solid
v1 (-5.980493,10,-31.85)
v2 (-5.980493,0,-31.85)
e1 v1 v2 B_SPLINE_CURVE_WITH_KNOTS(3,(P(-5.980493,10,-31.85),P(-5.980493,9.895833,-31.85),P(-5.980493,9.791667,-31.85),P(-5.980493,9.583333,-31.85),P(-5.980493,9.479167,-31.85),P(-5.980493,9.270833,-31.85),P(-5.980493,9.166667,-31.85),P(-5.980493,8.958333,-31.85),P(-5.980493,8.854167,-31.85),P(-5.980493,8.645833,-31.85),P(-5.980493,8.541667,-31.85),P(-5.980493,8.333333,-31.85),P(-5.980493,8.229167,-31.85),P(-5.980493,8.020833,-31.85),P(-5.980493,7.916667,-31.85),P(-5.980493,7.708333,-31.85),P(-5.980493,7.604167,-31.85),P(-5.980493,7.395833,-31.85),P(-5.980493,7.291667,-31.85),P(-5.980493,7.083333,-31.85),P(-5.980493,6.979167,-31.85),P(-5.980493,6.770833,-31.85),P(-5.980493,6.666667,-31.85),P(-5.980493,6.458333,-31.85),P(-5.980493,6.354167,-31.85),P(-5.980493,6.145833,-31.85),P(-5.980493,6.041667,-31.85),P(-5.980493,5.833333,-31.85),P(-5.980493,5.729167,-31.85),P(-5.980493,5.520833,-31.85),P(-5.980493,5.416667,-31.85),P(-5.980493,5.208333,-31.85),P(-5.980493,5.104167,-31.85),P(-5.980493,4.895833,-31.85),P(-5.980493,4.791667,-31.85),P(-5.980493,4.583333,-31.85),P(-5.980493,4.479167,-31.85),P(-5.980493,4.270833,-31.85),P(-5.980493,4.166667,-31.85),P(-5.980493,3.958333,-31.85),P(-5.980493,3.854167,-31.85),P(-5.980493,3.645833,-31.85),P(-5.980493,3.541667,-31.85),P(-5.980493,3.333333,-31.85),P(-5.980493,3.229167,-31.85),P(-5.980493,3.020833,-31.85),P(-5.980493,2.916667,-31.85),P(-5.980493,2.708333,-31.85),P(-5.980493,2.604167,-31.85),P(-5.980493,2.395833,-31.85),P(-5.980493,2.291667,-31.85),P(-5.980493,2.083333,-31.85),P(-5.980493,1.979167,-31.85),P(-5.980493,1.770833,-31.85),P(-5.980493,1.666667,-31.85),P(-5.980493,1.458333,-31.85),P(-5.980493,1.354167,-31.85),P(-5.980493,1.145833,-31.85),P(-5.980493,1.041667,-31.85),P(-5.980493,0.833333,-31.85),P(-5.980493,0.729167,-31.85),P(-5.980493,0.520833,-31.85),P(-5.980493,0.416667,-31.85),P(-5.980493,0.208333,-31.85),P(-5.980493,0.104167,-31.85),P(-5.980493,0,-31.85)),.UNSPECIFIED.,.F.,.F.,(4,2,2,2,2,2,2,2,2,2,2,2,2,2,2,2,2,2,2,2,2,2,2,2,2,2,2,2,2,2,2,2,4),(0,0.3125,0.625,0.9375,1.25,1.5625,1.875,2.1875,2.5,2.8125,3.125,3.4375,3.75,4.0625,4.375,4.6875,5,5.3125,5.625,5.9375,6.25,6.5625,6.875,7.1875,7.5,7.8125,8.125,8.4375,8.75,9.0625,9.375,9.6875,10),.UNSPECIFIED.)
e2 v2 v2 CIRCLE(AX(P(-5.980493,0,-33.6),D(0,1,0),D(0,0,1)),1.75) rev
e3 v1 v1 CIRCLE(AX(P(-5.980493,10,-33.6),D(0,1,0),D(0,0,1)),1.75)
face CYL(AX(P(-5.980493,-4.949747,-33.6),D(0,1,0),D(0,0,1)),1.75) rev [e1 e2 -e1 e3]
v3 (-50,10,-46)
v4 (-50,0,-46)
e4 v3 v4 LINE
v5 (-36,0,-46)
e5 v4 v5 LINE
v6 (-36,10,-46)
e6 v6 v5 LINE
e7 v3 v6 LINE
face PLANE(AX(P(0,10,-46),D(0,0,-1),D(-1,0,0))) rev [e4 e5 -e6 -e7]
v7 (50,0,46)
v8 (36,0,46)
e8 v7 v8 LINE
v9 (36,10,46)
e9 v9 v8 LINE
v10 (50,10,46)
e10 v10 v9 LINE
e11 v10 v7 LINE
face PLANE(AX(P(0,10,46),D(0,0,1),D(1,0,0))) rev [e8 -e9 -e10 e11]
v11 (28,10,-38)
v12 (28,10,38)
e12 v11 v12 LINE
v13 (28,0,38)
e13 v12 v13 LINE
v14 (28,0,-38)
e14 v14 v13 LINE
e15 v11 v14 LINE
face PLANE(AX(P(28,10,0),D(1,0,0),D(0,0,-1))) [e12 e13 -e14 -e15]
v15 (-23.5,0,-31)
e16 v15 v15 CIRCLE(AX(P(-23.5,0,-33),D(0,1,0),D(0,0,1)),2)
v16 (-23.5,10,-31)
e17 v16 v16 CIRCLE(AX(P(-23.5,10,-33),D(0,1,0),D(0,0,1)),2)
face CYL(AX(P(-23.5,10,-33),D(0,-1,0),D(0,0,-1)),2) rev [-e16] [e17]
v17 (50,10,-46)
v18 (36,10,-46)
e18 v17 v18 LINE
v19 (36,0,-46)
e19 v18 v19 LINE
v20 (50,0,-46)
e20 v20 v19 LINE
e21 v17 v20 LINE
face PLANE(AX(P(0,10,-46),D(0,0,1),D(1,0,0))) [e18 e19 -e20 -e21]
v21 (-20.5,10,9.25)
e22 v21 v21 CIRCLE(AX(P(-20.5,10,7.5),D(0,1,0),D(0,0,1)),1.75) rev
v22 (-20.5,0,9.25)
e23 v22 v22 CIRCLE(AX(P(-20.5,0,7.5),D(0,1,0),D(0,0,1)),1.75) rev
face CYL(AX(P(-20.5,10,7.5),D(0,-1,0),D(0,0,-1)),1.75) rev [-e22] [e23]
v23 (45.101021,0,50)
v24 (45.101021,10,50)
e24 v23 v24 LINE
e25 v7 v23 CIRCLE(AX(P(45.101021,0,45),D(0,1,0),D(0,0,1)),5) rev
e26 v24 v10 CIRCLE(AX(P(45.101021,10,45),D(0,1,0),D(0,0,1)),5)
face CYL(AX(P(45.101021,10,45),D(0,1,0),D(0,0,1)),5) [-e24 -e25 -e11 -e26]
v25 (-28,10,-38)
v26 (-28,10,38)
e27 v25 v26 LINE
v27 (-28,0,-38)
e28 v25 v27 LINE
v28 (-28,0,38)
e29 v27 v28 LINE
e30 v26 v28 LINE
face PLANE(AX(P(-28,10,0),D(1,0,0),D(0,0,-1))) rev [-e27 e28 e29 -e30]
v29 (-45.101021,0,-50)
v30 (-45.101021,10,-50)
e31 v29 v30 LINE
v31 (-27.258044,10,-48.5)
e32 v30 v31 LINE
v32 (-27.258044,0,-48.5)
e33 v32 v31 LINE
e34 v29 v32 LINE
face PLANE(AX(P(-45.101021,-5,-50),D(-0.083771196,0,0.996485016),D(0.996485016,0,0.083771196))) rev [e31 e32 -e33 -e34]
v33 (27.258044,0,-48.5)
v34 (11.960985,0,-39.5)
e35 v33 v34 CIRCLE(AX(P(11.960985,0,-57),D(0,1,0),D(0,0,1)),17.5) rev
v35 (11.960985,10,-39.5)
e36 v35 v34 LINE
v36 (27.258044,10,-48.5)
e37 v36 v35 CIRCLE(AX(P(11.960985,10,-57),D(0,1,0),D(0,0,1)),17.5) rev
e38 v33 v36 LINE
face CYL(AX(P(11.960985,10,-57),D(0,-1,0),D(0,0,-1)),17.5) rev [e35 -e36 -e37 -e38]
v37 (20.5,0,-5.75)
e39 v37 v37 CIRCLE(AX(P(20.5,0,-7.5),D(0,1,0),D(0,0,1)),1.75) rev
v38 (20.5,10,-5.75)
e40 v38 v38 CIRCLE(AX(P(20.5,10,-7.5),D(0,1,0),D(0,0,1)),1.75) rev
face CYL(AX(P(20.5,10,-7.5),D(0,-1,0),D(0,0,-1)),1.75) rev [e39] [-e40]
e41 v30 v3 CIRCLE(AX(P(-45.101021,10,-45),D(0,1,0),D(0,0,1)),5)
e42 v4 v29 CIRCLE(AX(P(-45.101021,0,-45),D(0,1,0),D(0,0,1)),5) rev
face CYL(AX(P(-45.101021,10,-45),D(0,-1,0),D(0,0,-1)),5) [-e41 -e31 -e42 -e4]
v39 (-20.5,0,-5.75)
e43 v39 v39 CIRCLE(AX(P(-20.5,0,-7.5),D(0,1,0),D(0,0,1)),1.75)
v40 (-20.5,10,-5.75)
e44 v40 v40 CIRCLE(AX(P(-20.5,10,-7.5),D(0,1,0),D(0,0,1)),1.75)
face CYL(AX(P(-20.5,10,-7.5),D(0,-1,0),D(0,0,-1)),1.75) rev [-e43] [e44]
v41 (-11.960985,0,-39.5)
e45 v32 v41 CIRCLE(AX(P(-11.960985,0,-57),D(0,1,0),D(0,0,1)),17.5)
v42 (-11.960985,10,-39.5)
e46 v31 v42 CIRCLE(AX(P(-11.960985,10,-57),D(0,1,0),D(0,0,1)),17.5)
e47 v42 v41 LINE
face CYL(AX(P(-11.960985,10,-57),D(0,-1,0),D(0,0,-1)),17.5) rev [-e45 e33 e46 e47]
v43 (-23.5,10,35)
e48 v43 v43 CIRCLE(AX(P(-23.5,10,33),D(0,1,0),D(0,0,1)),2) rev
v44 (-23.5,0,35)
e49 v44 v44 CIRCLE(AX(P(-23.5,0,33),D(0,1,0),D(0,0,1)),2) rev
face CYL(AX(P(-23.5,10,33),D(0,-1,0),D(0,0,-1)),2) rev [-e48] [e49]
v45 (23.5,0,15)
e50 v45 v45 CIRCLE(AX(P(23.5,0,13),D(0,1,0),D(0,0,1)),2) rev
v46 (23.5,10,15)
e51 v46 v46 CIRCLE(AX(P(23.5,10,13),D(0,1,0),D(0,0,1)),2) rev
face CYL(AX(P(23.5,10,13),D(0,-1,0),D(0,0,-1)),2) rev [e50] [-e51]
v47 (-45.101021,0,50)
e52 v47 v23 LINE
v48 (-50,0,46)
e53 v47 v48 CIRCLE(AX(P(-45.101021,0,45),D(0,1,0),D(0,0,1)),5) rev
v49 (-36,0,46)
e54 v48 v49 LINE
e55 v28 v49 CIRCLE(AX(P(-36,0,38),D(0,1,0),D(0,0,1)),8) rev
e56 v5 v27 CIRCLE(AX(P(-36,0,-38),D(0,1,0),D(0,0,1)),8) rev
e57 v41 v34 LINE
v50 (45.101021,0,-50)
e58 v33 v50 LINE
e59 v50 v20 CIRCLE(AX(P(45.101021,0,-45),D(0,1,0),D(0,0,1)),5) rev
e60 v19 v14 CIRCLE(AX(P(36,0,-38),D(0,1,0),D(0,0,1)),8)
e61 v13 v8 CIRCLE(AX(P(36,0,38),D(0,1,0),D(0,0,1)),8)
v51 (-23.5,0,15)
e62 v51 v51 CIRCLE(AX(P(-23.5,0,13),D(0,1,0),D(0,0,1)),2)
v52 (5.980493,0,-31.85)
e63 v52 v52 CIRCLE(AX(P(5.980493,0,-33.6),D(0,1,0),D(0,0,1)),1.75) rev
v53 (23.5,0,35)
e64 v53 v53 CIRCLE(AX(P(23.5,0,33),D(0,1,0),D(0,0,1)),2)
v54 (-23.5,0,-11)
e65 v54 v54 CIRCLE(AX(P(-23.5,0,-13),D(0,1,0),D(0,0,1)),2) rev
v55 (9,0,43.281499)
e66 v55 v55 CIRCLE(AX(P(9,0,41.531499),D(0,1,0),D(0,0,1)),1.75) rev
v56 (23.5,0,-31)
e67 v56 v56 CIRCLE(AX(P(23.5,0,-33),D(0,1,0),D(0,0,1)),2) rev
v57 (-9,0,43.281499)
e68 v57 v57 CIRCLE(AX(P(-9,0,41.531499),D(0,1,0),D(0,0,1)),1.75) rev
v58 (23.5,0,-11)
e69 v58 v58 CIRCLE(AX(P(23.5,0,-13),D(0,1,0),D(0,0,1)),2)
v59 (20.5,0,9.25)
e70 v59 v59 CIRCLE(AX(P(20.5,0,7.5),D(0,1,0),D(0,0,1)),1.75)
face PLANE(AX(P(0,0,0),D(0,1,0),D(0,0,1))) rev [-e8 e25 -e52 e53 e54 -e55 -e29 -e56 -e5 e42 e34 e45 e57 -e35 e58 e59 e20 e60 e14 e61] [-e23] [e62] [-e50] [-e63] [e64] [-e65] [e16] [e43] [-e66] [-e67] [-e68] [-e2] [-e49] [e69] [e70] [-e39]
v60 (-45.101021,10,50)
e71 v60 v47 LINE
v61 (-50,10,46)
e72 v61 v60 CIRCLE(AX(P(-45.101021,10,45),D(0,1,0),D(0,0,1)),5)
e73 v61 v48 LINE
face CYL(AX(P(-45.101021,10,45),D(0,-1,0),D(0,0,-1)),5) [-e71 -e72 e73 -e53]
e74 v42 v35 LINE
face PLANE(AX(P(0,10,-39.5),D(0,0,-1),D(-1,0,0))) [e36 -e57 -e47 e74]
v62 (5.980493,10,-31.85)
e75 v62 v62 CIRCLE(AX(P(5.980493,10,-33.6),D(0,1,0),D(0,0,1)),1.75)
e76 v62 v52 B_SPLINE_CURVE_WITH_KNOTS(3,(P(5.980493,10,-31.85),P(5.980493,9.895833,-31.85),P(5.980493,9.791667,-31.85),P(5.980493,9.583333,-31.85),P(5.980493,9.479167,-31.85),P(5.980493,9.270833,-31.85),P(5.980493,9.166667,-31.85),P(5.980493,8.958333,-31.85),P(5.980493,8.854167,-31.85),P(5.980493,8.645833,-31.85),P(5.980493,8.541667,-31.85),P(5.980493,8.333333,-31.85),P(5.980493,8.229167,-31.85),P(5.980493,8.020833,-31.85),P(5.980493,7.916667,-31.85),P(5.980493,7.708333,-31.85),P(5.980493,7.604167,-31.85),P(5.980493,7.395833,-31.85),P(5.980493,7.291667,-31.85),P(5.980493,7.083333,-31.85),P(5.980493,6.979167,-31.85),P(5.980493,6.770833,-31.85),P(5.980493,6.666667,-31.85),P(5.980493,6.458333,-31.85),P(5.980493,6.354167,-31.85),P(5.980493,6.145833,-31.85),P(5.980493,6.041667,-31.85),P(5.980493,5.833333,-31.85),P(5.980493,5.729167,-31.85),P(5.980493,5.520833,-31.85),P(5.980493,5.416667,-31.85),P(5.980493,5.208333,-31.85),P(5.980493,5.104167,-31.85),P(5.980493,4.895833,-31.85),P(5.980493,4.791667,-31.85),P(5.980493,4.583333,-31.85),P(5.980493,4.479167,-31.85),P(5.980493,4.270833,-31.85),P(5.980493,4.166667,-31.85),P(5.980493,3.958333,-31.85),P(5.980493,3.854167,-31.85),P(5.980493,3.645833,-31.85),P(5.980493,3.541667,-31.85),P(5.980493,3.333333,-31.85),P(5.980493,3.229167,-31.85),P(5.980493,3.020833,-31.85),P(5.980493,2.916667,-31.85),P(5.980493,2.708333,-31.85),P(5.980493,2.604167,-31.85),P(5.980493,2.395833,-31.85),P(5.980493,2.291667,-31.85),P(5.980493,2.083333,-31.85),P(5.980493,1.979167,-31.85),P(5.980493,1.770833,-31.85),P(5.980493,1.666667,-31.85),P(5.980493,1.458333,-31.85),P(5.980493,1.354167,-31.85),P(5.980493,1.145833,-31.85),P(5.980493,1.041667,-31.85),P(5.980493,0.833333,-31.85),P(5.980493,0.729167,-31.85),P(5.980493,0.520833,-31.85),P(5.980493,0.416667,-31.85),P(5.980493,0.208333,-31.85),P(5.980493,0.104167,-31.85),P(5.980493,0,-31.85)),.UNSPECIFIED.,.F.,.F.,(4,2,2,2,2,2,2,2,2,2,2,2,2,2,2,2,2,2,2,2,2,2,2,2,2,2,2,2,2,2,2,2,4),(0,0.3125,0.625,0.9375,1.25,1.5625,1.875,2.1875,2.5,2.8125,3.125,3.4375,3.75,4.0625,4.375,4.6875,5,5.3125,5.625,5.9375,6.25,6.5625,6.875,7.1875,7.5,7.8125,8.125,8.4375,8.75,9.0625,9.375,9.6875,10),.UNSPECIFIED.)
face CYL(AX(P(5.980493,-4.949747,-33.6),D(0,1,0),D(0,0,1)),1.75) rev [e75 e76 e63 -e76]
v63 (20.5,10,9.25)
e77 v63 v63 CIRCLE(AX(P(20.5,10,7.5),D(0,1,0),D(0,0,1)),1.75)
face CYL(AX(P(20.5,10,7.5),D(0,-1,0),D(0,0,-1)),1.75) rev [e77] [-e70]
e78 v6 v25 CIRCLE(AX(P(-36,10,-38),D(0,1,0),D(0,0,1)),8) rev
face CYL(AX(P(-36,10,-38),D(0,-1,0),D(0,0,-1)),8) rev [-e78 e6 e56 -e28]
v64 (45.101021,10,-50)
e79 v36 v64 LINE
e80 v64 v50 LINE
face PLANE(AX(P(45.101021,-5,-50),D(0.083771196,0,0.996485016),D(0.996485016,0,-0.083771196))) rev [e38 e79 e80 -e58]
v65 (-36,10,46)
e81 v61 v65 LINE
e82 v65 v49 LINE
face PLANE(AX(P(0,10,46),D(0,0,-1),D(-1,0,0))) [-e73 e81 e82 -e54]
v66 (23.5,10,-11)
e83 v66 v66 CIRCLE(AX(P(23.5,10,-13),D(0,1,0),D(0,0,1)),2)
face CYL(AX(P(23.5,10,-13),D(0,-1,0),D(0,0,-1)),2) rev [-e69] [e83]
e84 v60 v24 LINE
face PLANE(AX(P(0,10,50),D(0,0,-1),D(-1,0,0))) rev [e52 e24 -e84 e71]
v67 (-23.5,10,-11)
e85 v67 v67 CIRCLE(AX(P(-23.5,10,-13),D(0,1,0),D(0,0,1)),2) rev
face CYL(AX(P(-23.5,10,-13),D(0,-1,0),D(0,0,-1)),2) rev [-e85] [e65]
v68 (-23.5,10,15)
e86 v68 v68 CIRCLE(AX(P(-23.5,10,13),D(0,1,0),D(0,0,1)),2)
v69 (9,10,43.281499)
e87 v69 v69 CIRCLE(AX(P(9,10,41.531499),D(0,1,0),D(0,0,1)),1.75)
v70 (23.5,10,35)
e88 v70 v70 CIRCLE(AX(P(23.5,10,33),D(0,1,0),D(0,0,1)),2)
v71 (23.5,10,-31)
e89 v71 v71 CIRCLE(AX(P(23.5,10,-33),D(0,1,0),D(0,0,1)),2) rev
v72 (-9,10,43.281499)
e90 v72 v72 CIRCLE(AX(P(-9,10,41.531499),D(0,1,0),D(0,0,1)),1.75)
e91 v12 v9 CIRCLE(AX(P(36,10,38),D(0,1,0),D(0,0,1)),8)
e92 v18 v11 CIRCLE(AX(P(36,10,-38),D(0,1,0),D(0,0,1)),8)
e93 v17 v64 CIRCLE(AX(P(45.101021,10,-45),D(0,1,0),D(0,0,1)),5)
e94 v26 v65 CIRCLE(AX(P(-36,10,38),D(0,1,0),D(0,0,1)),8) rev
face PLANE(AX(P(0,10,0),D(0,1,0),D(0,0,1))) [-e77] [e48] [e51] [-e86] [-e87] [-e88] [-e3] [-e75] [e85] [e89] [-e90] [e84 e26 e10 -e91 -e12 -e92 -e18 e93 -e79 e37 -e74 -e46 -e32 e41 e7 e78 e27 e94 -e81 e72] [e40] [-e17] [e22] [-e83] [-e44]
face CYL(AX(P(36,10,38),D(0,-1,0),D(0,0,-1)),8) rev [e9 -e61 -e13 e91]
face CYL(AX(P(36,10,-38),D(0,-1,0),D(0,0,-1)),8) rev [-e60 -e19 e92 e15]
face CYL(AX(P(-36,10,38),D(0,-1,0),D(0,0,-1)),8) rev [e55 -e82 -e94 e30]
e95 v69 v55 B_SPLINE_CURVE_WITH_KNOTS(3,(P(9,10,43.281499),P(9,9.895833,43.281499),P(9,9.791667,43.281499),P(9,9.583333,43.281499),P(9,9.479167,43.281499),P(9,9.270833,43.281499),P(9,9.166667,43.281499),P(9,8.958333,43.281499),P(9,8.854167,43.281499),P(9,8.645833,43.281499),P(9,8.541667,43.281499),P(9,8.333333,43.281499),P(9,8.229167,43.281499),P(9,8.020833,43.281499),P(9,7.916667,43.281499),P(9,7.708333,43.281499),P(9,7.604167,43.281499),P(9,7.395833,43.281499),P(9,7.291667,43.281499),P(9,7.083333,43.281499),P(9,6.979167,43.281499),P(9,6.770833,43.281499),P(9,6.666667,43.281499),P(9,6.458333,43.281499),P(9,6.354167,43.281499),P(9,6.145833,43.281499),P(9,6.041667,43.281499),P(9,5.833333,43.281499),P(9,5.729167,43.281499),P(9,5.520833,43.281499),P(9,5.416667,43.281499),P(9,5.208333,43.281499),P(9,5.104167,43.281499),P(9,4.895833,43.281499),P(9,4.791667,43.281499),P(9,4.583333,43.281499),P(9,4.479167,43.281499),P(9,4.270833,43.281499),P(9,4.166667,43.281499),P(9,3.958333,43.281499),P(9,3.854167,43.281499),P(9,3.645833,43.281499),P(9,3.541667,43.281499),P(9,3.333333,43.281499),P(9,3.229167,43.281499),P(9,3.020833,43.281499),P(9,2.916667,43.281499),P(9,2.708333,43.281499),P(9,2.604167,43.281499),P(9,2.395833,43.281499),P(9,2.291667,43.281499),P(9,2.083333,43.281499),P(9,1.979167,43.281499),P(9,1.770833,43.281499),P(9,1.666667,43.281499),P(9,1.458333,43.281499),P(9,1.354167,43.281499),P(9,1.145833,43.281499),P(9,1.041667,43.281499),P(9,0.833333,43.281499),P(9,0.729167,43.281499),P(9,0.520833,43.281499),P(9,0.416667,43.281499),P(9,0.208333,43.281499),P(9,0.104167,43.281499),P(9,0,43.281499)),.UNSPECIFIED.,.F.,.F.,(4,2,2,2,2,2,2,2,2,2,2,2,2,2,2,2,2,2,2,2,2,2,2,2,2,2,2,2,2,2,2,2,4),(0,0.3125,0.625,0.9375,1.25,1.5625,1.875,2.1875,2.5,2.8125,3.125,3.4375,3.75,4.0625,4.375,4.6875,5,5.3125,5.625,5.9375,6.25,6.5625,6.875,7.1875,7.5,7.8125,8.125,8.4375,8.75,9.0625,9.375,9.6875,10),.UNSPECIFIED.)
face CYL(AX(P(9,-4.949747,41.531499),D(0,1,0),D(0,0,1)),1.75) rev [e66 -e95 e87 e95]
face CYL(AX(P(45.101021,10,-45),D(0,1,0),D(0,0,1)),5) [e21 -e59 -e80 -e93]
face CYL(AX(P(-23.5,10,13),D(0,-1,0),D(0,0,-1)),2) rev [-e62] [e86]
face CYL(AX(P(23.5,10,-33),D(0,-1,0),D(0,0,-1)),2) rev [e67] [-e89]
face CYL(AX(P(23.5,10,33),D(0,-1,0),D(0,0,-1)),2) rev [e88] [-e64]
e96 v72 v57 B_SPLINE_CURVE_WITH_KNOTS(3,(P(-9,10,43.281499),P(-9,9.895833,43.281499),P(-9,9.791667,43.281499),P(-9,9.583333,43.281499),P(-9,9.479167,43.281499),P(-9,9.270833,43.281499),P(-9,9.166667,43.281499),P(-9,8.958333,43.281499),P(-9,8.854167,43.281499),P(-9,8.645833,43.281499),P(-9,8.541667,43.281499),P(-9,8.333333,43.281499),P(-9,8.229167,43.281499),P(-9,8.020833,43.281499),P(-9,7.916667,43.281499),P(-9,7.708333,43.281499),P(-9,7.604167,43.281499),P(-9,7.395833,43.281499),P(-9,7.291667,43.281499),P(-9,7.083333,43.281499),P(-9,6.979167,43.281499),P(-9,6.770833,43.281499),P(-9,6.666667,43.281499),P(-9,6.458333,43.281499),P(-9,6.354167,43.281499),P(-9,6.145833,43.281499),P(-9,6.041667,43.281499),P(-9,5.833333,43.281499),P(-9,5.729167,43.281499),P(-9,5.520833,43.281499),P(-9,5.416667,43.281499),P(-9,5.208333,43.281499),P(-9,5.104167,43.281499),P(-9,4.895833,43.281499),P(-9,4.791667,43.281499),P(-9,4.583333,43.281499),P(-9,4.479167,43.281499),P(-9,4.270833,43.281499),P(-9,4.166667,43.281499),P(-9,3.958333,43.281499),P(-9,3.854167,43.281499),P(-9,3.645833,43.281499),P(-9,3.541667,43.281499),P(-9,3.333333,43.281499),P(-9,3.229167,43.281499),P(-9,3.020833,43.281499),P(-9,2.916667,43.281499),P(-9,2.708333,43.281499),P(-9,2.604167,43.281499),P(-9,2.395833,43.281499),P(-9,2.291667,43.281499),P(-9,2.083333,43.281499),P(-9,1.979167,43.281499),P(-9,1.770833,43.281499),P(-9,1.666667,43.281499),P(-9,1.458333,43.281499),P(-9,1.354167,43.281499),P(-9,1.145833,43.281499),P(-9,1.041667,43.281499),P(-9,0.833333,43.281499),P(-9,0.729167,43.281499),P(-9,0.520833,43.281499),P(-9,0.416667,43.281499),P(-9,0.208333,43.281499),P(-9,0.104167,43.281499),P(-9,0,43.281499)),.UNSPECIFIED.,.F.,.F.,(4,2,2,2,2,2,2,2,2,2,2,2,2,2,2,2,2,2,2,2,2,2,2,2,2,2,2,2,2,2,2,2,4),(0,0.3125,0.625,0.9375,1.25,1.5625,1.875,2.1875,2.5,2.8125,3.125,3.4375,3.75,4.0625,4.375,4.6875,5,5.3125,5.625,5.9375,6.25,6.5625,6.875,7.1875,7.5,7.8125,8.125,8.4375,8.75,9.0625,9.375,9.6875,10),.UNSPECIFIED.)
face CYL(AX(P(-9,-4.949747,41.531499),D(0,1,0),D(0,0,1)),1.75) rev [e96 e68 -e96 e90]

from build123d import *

# Parameters (mm, degrees)
SKETCH2_R               = 2
SKETCH2_R_2             = 1.75
BOSS_EXTRUDE1_DEPTH     = 10
FILLET1_R               = 5
CUT_EXTRUDE1_START      = -15
CUT_EXTRUDE1_DEPTH      = 15
CUT_EXTRUDE2_DEPTH      = 72.414284285
CUT_EXTRUDE2_DEPTH_BACK = 10
SKETCH5_R               = 1.75


with BuildPart() as part:
    # Sketch2 → Boss-Extrude1 (new body)
    with BuildSketch(Plane(origin=(0, 0, 0), x_dir=(1, 0, 0), z_dir=(0, 1, 0))):
        with BuildLine():
            Line((-50, 50), (-28, 50))
            ThreePointArc((-28, 50), (-21.546129824, 42.358449536), (-11.960985068, 39.5))
            Line((-11.960985068, 39.5), (11.960985068, 39.5))
            ThreePointArc((11.960985068, 39.5), (21.546129824, 42.358449536), (28, 50))
            Line((28, 50), (50, 50))
            Line((50, 50), (50, 46))
            Line((50, 46), (36, 46))
            ThreePointArc((36, 46), (30.343145751, 43.656854249), (28, 38))
            Line((28, 38), (28, -38))
            ThreePointArc((28, -38), (30.343145751, -43.656854249), (36, -46))
            Line((36, -46), (50, -46))
            Line((50, -46), (50, -50))
            Line((50, -50), (-50, -50))
            Line((-50, -50), (-50, -46))
            Line((-50, -46), (-36, -46))
            ThreePointArc((-36, -46), (-30.343145751, -43.656854249), (-28, -38))
            Line((-28, -38), (-28, 38))
            ThreePointArc((-28, 38), (-30.343145751, 43.656854249), (-36, 46))
            Line((-36, 46), (-50, 46))
            Line((-50, 46), (-50, 50))
        make_face()
        with Locations(Location((-23.5, 33, 0), (0, 0, 270))):
            Circle(SKETCH2_R, mode=Mode.SUBTRACT)
        with Locations(Location((-23.5, 13, 0), (0, 0, 270))):
            Circle(SKETCH2_R, mode=Mode.SUBTRACT)
        with Locations(Location((23.5, 33, 0), (0, 0, 270))):
            Circle(SKETCH2_R, mode=Mode.SUBTRACT)
        with Locations(Location((23.5, 13, 0), (0, 0, 270))):
            Circle(SKETCH2_R, mode=Mode.SUBTRACT)
        with Locations(Location((-23.5, -33, 0), (0, 0, 270))):
            Circle(SKETCH2_R, mode=Mode.SUBTRACT)
        with Locations(Location((23.5, -33, 0), (0, 0, 270))):
            Circle(SKETCH2_R, mode=Mode.SUBTRACT)
        with Locations(Location((23.5, -13, 0), (0, 0, 270))):
            Circle(SKETCH2_R, mode=Mode.SUBTRACT)
        with Locations(Location((-23.5, -13, 0), (0, 0, 270))):
            Circle(SKETCH2_R, mode=Mode.SUBTRACT)
        with Locations(Location((-20.5, 7.5, 0), (0, 0, 270))):
            Circle(SKETCH2_R_2, mode=Mode.SUBTRACT)
        with Locations(Location((20.5, 7.5, 0), (0, 0, 270))):
            Circle(SKETCH2_R_2, mode=Mode.SUBTRACT)
        with Locations(Location((20.5, -7.5, 0), (0, 0, 270))):
            Circle(SKETCH2_R_2, mode=Mode.SUBTRACT)
        with Locations(Location((-20.5, -7.5, 0), (0, 0, 270))):
            Circle(SKETCH2_R_2, mode=Mode.SUBTRACT)
    extrude(amount=BOSS_EXTRUDE1_DEPTH)

    # Fillet1
    # the kernel refuses this fillet: 5 mm, written as the material it takes off along each edge
    with BuildSketch(Plane(origin=(50, -12.247448714, 50), x_dir=(-1.5667467323505199e-12, 0, -1.0), z_dir=(0, 1, 0)), Plane(origin=(-50, -12.247448714, -50), x_dir=(1.5685230891899197e-12, 0, 1.0), z_dir=(0, 1, 0))) as fillet1_piece_1:
        with BuildLine():
            CenterArc((5, 4.898979486), FILLET1_R, 180, 78.463040967)
            Line((0, 4.898979486), (-0.1, 4.898979486))
            Line((-0.1, 4.898979486), (-0.1, 0))
            Line((-0.1, 0), (0, -0.1))
            ThreePointArc((0, -0.1), (2, -0.1), (3.98, -0.09797959))
            Line((3.98, -0.09797959), (4, 0))
        make_face()
    extrude(amount=34.494897428, mode=Mode.SUBTRACT)
    with BuildSketch(Plane(origin=(-50, -12.247448714, 50), x_dir=(1, 0, 0), z_dir=(0, 1, 0)), Plane(origin=(50, -12.247448714, -50), x_dir=(-1, 0, 0), z_dir=(0, 1, 0))) as fillet1_piece_2:
        with BuildLine():
            CenterArc((4.898979486, 5), FILLET1_R, 191.536959033, 78.463040967)
            Line((0, 4), (-0.09797959, 3.98))
            ThreePointArc((-0.09797959, 3.98), (-0.1, 2), (-0.1, 0))
            Line((-0.1, 0), (0, -0.1))
            Line((0, -0.1), (4.898979486, -0.1))
            Line((4.898979486, -0.1), (4.898979486, 0))
        make_face()
    extrude(amount=34.494897428, mode=Mode.SUBTRACT)

    # Sketch4 → Cut-Extrude1 (cut)
    with BuildSketch(Plane(origin=(0, 10, 0), x_dir=(1, 0, 0), z_dir=(0, 1, 0)).offset(CUT_EXTRUDE1_START)):
        with BuildLine():
            Line((45.101020514, 50), (27.258043608, 48.5))
            ThreePointArc((27.258043608, 48.5), (27.646962091, 49.24112606), (28, 50))
            Line((28, 50), (45.101020514, 50))
        make_face()
        with BuildLine():
            Line((-45.101020514, 50), (-27.258043608, 48.5))
            ThreePointArc((-27.258043608, 48.5), (-27.646962091, 49.24112606), (-28, 50))
            Line((-28, 50), (-45.101020514, 50))
        make_face()
    extrude(amount=CUT_EXTRUDE1_DEPTH, mode=Mode.SUBTRACT)

    # Sketch5 → Cut-Extrude2 (cut, two sides: drawn at the far end of the back side and taken through both)
    with BuildSketch(Plane(origin=(0, 10, 0), x_dir=(1, 0, 0), z_dir=(0, 1, 0)).offset(-CUT_EXTRUDE2_DEPTH_BACK)):
        with Locations(Location((9, -41.531499153, 0), (0, 0, 270))):
            Circle(SKETCH5_R)
        with Locations(Location((-9, -41.531499153, 0), (0, 0, 270))):
            Circle(SKETCH5_R)
        with Locations(Location((5.980492534, 33.6, 0), (0, 0, 270))):
            Circle(SKETCH5_R)
        with Locations(Location((-5.980492534, 33.6, 0), (0, 0, 270))):
            Circle(SKETCH5_R)
    extrude(amount=CUT_EXTRUDE2_DEPTH + CUT_EXTRUDE2_DEPTH_BACK, mode=Mode.SUBTRACT)


solid = part.part
